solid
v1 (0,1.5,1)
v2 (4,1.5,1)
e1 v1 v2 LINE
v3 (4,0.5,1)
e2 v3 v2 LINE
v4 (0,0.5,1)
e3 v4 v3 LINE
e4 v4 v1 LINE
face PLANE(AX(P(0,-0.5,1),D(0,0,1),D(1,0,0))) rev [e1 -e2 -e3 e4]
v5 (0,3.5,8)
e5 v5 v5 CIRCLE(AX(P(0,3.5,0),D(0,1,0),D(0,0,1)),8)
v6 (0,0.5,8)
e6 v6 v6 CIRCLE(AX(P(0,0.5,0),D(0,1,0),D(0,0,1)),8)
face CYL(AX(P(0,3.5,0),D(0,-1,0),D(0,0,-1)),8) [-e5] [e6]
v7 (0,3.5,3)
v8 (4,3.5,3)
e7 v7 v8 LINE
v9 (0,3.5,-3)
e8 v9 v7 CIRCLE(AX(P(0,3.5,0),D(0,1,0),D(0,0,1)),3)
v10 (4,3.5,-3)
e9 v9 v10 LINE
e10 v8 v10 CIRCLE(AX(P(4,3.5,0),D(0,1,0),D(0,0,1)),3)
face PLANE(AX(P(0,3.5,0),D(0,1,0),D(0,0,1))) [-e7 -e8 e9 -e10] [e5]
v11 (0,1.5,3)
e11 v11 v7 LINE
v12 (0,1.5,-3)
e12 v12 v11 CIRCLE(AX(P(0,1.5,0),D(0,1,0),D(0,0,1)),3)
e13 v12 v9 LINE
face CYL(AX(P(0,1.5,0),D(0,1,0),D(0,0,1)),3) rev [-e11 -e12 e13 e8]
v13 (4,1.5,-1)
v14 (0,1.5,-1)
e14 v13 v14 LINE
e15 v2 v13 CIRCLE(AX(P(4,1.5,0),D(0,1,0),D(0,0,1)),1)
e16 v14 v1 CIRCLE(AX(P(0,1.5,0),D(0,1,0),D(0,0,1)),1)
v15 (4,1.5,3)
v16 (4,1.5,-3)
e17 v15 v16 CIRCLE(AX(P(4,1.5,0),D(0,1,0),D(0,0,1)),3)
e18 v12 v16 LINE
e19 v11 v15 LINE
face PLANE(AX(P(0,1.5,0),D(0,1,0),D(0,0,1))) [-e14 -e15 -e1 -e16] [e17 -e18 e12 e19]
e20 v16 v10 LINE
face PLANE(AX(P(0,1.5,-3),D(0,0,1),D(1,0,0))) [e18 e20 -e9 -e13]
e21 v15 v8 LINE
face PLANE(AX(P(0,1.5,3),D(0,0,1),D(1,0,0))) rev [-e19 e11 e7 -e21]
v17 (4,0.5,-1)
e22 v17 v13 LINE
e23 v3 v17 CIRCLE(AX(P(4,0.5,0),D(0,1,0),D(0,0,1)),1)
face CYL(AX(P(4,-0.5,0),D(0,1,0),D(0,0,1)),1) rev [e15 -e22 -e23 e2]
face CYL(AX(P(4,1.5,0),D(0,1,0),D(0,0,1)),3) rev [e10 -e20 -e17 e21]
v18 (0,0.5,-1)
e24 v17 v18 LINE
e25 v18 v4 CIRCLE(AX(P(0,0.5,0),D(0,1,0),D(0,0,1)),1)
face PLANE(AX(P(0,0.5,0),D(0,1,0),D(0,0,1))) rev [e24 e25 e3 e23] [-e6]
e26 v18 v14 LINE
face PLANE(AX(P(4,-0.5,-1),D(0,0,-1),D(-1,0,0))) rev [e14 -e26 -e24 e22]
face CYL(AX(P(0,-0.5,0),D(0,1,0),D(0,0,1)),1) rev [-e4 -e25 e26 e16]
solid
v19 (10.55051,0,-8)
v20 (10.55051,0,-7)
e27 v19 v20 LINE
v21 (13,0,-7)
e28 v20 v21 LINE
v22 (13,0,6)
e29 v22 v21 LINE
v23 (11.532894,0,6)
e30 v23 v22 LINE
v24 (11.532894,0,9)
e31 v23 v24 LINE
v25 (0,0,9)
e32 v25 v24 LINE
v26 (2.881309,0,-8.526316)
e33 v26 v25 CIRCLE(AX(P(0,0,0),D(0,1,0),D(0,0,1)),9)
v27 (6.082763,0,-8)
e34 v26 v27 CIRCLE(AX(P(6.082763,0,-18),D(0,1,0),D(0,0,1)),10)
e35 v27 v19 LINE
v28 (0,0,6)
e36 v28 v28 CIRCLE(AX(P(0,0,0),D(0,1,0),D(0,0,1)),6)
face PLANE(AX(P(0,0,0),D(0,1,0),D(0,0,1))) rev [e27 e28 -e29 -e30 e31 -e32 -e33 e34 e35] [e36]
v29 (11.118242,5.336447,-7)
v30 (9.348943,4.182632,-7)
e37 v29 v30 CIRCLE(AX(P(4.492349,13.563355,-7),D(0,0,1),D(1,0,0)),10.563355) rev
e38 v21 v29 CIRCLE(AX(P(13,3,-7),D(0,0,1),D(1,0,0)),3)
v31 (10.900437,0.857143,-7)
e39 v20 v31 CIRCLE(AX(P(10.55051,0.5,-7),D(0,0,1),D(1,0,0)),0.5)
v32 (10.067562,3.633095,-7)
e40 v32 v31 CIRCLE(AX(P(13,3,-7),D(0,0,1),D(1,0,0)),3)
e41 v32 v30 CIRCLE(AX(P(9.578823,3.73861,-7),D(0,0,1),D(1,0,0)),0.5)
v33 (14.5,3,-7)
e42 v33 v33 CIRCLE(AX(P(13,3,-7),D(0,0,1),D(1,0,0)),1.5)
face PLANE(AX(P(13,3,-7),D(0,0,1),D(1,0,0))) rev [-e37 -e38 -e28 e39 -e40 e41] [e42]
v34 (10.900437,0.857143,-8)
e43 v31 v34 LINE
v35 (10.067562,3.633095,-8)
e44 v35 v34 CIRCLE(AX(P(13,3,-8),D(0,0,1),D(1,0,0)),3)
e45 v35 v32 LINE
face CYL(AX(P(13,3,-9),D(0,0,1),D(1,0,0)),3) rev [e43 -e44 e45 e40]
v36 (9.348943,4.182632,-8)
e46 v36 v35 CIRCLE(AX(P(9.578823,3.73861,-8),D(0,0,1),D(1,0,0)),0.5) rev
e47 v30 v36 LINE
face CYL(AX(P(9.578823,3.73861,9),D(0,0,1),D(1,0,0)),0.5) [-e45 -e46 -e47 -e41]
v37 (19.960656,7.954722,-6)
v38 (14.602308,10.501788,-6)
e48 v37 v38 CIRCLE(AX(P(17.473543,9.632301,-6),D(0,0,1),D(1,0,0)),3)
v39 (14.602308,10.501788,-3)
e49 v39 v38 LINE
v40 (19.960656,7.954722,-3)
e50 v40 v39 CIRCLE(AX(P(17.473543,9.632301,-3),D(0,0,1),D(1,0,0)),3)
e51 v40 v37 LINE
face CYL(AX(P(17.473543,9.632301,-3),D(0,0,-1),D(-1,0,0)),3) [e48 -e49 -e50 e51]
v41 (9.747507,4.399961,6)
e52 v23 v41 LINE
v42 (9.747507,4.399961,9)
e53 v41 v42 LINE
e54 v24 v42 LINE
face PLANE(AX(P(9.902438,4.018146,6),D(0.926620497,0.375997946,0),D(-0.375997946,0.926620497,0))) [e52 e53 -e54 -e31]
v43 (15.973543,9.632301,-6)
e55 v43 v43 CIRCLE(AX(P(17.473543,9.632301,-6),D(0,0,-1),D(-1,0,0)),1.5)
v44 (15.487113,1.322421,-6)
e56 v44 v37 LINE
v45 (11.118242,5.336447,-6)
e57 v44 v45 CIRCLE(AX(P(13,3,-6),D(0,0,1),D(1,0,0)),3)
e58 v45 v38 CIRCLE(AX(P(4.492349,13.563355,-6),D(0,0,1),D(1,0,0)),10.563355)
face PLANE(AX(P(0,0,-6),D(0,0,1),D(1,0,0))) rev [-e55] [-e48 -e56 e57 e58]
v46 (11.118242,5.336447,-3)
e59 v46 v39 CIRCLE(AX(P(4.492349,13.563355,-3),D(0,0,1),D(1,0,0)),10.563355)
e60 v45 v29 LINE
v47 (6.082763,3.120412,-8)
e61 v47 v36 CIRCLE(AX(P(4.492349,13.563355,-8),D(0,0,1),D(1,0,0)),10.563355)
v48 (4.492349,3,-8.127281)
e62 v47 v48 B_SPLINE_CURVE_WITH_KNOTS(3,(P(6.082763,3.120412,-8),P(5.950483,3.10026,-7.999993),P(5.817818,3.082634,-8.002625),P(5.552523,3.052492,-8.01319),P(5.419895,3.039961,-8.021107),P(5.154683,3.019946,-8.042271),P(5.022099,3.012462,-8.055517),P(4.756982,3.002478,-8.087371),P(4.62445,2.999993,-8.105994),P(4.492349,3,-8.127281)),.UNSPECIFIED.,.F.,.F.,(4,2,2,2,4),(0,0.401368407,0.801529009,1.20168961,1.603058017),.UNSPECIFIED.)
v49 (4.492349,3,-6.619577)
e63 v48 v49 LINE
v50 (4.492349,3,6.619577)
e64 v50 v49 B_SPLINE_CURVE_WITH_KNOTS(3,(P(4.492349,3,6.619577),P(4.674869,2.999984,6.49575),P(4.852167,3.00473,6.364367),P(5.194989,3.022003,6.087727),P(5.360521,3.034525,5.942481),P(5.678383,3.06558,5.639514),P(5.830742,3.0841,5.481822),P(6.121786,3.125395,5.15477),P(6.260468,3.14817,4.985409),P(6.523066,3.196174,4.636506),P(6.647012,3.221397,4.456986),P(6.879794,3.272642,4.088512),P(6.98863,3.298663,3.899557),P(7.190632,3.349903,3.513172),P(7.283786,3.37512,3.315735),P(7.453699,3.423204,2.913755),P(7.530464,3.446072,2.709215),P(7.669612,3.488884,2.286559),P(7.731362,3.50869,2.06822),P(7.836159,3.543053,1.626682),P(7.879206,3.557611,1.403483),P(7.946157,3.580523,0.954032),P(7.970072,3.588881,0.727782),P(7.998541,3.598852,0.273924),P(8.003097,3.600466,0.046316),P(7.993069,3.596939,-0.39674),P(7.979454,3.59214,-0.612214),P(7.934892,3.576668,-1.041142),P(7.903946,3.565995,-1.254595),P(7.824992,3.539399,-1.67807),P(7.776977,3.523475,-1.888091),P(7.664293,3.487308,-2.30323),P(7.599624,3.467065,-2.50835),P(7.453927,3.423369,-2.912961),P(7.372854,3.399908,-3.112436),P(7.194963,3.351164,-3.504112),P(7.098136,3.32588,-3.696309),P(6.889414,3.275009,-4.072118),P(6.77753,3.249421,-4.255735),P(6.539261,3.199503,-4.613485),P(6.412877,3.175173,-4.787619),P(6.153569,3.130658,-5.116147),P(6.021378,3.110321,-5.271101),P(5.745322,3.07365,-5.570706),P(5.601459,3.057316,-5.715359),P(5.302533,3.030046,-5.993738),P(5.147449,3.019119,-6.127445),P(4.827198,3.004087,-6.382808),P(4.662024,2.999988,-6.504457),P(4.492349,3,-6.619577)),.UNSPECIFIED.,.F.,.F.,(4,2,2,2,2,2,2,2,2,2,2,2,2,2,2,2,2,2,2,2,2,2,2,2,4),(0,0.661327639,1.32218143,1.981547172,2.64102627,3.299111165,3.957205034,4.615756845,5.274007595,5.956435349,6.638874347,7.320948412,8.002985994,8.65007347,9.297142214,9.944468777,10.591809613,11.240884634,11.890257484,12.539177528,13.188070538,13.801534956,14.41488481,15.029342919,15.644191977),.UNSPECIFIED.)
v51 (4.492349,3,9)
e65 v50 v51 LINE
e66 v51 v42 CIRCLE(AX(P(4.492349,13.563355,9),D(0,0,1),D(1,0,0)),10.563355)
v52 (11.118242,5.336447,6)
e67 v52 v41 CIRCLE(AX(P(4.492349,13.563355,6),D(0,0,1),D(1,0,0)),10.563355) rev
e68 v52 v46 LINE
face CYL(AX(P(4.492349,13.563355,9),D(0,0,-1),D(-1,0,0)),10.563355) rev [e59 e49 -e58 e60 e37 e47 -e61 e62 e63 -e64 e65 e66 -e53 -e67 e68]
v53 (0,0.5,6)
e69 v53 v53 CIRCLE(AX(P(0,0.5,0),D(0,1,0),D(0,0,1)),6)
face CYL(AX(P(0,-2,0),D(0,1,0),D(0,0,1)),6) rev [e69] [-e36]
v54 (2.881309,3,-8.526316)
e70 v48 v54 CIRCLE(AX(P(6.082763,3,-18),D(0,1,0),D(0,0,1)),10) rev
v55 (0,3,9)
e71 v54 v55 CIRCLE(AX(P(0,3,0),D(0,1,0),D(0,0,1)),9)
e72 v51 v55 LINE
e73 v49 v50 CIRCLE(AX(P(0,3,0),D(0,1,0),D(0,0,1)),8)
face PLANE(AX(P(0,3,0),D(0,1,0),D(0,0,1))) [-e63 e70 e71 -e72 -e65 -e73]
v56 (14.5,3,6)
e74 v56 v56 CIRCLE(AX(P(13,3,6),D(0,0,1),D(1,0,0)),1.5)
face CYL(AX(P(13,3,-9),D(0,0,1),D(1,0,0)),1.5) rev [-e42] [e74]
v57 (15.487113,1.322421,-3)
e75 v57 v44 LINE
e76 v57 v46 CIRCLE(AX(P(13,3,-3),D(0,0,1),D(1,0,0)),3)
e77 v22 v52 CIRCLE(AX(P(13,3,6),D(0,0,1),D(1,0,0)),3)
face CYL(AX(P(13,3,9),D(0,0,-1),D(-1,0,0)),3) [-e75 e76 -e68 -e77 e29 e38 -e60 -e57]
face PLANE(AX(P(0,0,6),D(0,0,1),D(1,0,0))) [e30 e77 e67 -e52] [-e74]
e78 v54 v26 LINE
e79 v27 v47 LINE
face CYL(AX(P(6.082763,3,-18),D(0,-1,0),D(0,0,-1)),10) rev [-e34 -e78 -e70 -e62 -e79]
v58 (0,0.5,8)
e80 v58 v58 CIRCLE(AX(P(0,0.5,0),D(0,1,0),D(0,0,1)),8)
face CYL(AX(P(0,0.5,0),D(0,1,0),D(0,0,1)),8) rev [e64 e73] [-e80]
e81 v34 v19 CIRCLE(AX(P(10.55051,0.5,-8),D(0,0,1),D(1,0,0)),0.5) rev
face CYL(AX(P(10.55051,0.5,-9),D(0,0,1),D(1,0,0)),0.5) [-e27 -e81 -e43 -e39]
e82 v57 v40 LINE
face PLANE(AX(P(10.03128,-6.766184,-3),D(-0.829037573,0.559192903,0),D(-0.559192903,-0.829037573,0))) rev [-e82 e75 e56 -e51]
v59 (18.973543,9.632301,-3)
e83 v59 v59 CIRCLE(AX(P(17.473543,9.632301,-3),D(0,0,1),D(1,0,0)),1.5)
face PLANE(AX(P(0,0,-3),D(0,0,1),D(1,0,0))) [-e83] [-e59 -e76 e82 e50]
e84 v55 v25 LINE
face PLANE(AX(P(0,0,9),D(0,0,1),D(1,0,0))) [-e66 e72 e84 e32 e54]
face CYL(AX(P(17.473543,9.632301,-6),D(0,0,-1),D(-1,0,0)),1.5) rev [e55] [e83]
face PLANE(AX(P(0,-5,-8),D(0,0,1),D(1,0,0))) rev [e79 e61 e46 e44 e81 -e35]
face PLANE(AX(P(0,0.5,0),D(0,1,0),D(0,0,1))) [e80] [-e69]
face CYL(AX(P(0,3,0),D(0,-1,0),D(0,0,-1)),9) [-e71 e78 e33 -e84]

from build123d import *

# Parameters (mm, degrees)
SKETCH1_R           = 9
BOSS_EXTRUDE1_DEPTH = 3
SKETCH2_W           = 4.492348724
SKETCH2_H           = 3
BOSS_EXTRUDE2_DEPTH = 9
CUT_EXTRUDE1_DEPTH  = 8
BOSS_EXTRUDE6_START = -6
BOSS_EXTRUDE6_DEPTH = 3
FILLET1_R           = 10
SKETCH4_R           = 3
CUT_EXTRUDE2_DEPTH  = 1
SKETCH5_R           = 8
CUT_EXTRUDE3_DEPTH  = 2.5
SKETCH6_R           = 6
CUT_EXTRUDE4_DEPTH  = 2.5
CUT_EXTRUDE5_DEPTH  = 3
HOLE1_START         = -7
HOLE1_OUTLINE_R     = 1.5
HOLE1_DEPTH         = 13
SKETCH13_W          = 1.5
SKETCH13_H          = 15
SKETCH14_R          = 8
BOSS_EXTRUDE5_DEPTH = 3
CUT_EXTRUDE6_DEPTH  = 2
CUT_EXTRUDE7_DEPTH  = 2
FILLET5_R           = 0.5


with BuildPart() as part:
    # Sketch1 → Boss-Extrude1 (new body)
    with BuildSketch(Plane(origin=(0, 0, 0), x_dir=(1, 0, 0), z_dir=(0, 1, 0))):
        with Locations(Location((0, 0, 0), (0, 0, 270))):
            Circle(SKETCH1_R)
    extrude(amount=BOSS_EXTRUDE1_DEPTH)

    # Sketch2 → Boss-Extrude2 (add, symmetric)
    with BuildSketch(Plane.XY):
        with BuildLine():
            ThreePointArc((11.118241852, 5.336447362), (8.005233793, 3.601221323), (4.492348724, 3))
            Line((4.492348724, 3), (4.492348724, 0))
            Line((4.492348724, 0), (13, 0))
            ThreePointArc((13, 0), (10.170747264, 2.002338255), (11.118241852, 5.336447362))
        make_face()
        with BuildLine():
            ThreePointArc((16, 3), (14.29513041, 5.70603718), (11.118241852, 5.336447362))
            ThreePointArc((11.118241852, 5.336447362), (10.170747264, 2.002338255), (13, 0))
            ThreePointArc((13, 0), (14.408414688, 0.351157221), (15.487112718, 1.32242129))
            ThreePointArc((15.487112718, 1.32242129), (15.868914268, 2.122884886), (16, 3))
        make_face()
        with Locations((2.246174362, 1.5)):
            Rectangle(SKETCH2_W, SKETCH2_H)
    extrude(amount=BOSS_EXTRUDE2_DEPTH, both=True)

    # Sketch3 → Cut-Extrude1 (cut, symmetric)
    with BuildSketch(Plane(origin=(0, 3, 0), x_dir=(1, 0, 0), z_dir=(0, 1, 0))):
        with BuildLine():
            ThreePointArc((0, 9), (2.121320344, 8.746427842), (4.123105626, 8))
            Line((4.123105626, 8), (20.22341573, 8))
            Line((20.22341573, 8), (20.22341573, 9))
            Line((20.22341573, 9), (0, 9))
        make_face()
    extrude(amount=CUT_EXTRUDE1_DEPTH, both=True, mode=Mode.SUBTRACT)

    # Sketch2<3> → Boss-Extrude6 (add)
    with BuildSketch(Plane.XY.offset(BOSS_EXTRUDE6_START)):
        with BuildLine():
            ThreePointArc((14.602307947, 10.501787764), (13.249766942, 7.656401863), (11.118241852, 5.336447362))
            ThreePointArc((11.118241852, 5.336447362), (15.029708074, 5.20913674), (15.487112718, 1.32242129))
            Line((15.487112718, 1.32242129), (19.960655945, 7.95472187))
            ThreePointArc((19.960655945, 7.95472187), (18.761477117, 12.341770325), (14.602307947, 10.501787764))
        make_face()
    extrude(amount=BOSS_EXTRUDE6_DEPTH)

    # Fillet1
    fillet1_edges = [part.edges().sort_by_distance(p)[0] for p in [
        (4.123105626, 1.5, -8),
    ]]
    fillet(fillet1_edges, radius=FILLET1_R)

    # Sketch4 → Cut-Extrude2 (cut, symmetric)
    with BuildSketch(Plane.XY.offset(-8)):
        with Locations((13, 3)):
            Circle(SKETCH4_R)
    extrude(amount=CUT_EXTRUDE2_DEPTH, both=True, mode=Mode.SUBTRACT)

    # Sketch5 → Cut-Extrude3 (cut, symmetric)
    with BuildSketch(Plane(origin=(0, 3, 0), x_dir=(1, 0, 0), z_dir=(0, 1, 0))):
        with Locations(Location((0, 0, 0), (0, 0, 270))):
            Circle(SKETCH5_R)
    extrude(amount=CUT_EXTRUDE3_DEPTH, both=True, mode=Mode.SUBTRACT)

    # Sketch6 → Cut-Extrude4 (cut, symmetric)
    with BuildSketch(Plane(origin=(0, 0.5, 0), x_dir=(1, 0, 0), z_dir=(0, 1, 0))):
        with Locations(Location((0, 0, 0), (0, 0, 270))):
            Circle(SKETCH6_R)
    extrude(amount=CUT_EXTRUDE4_DEPTH, both=True, mode=Mode.SUBTRACT)

    # Sketch7 → Cut-Extrude5 (cut)
    with BuildSketch(Plane(origin=(0, 0, 9), x_dir=(-1, 0, 0), z_dir=(0, 0, -1))):
        with BuildLine():
            Line((-13, 0), (-11.53289423, 0))
            Line((-11.53289423, 0), (-9.747506928, 4.399961457))
            ThreePointArc((-9.747506928, 4.399961457), (-10.451299694, 4.841235284), (-11.118241854, 5.336447363))
            ThreePointArc((-11.118241854, 5.336447363), (-15.829252736, 3.997661744), (-13, 0))
        make_face()
    extrude(amount=CUT_EXTRUDE5_DEPTH, mode=Mode.SUBTRACT)

    # Hole1: read off the stored shape, not the designer's step
    # Hole1 outline → Hole1 (cut)
    with BuildSketch(Plane.XY.offset(HOLE1_START)):
        with Locations((13, 3)):
            Circle(HOLE1_OUTLINE_R)
    extrude(amount=HOLE1_DEPTH, mode=Mode.SUBTRACT)

    # Sketch13 → Ø3.0 mm Dowel Holes1 (revolve, cut)
    with BuildSketch(Plane(origin=(17.473543228, 9.63230058, -6), x_dir=(0, 1, 0), z_dir=(1, 0, 0))):
        with Locations((0.75, 7.5)):
            Rectangle(SKETCH13_W, SKETCH13_H)
    revolve(axis=Axis((17.473543228, 9.63230058, -12.35), (0, 0, 1)), mode=Mode.SUBTRACT)

    # Fillet5
    # the kernel refuses this fillet: 0.5 mm, written as the material it takes off along each edge
    with BuildSketch(Plane(origin=(13, 0, -14.123724357), x_dir=(-1, 0, 0), z_dir=(0, 0, 1))) as fillet5_piece_1:
        with BuildLine():
            CenterArc((2.449489743, -0.5), FILLET5_R, 90, 135.584691403)
            ThreePointArc((2.099562637, -0.857142857), (1.133893419, -0.222539701), (0, 0))
            Line((0, 0), (2.449489743, 0))
        make_face()
    extrude(amount=7.123724357, mode=Mode.SUBTRACT)
    with BuildSketch(Plane(origin=(11.118241852, 5.336447362, -13.280688141), x_dir=(-0.524989604384867, -0.8511086389455936, 0), z_dir=(0, 0, 1))) as fillet5_piece_2:
        with BuildLine():
            CenterArc((2.168111982, -0.471365199), FILLET5_R, 109.484734083, 129.554348195)
            ThreePointArc((1.910885347, -0.900124407), (0.977998077, -0.402179055), (0, 0))
            ThreePointArc((0, 0), (1.000667069, -0.171808808), (2.001334137, 0))
        make_face()
    extrude(amount=6.280688141, mode=Mode.SUBTRACT)


with BuildPart() as body_2:
    # Sketch14 → Boss-Extrude5 (new body)
    with BuildSketch(Plane(origin=(0, 0.5, 0), x_dir=(1, 0, 0), z_dir=(0, 1, 0))):
        with Locations(Location((0, 0, 0), (0, 0, 270))):
            Circle(SKETCH14_R)
    extrude(amount=BOSS_EXTRUDE5_DEPTH)

    # Sketch15 → Cut-Extrude6 (cut)
    with BuildSketch(Plane(origin=(0, 3.5, 0), x_dir=(1, 0, 0), z_dir=(0, 1, 0))):
        with BuildLine():
            Line((0, 3), (4, 3))
            ThreePointArc((4, 3), (7, 0), (4, -3))
            Line((4, -3), (0, -3))
            ThreePointArc((0, -3), (-3, 0), (0, 3))
        make_face()
    extrude(amount=-CUT_EXTRUDE6_DEPTH, mode=Mode.SUBTRACT)

    # Sketch17 → Cut-Extrude7 (cut)
    with BuildSketch(Plane(origin=(0, 1.5, 0), x_dir=(1, 0, 0), z_dir=(0, 1, 0))):
        with BuildLine():
            Line((0, -1), (4, -1))
            ThreePointArc((4, -1), (5, 0), (4, 1))
            Line((4, 1), (0, 1))
            ThreePointArc((0, 1), (-1, 0), (0, -1))
        make_face()
    extrude(amount=-CUT_EXTRUDE7_DEPTH, mode=Mode.SUBTRACT)


solid = Compound([part.part, body_2.part])
